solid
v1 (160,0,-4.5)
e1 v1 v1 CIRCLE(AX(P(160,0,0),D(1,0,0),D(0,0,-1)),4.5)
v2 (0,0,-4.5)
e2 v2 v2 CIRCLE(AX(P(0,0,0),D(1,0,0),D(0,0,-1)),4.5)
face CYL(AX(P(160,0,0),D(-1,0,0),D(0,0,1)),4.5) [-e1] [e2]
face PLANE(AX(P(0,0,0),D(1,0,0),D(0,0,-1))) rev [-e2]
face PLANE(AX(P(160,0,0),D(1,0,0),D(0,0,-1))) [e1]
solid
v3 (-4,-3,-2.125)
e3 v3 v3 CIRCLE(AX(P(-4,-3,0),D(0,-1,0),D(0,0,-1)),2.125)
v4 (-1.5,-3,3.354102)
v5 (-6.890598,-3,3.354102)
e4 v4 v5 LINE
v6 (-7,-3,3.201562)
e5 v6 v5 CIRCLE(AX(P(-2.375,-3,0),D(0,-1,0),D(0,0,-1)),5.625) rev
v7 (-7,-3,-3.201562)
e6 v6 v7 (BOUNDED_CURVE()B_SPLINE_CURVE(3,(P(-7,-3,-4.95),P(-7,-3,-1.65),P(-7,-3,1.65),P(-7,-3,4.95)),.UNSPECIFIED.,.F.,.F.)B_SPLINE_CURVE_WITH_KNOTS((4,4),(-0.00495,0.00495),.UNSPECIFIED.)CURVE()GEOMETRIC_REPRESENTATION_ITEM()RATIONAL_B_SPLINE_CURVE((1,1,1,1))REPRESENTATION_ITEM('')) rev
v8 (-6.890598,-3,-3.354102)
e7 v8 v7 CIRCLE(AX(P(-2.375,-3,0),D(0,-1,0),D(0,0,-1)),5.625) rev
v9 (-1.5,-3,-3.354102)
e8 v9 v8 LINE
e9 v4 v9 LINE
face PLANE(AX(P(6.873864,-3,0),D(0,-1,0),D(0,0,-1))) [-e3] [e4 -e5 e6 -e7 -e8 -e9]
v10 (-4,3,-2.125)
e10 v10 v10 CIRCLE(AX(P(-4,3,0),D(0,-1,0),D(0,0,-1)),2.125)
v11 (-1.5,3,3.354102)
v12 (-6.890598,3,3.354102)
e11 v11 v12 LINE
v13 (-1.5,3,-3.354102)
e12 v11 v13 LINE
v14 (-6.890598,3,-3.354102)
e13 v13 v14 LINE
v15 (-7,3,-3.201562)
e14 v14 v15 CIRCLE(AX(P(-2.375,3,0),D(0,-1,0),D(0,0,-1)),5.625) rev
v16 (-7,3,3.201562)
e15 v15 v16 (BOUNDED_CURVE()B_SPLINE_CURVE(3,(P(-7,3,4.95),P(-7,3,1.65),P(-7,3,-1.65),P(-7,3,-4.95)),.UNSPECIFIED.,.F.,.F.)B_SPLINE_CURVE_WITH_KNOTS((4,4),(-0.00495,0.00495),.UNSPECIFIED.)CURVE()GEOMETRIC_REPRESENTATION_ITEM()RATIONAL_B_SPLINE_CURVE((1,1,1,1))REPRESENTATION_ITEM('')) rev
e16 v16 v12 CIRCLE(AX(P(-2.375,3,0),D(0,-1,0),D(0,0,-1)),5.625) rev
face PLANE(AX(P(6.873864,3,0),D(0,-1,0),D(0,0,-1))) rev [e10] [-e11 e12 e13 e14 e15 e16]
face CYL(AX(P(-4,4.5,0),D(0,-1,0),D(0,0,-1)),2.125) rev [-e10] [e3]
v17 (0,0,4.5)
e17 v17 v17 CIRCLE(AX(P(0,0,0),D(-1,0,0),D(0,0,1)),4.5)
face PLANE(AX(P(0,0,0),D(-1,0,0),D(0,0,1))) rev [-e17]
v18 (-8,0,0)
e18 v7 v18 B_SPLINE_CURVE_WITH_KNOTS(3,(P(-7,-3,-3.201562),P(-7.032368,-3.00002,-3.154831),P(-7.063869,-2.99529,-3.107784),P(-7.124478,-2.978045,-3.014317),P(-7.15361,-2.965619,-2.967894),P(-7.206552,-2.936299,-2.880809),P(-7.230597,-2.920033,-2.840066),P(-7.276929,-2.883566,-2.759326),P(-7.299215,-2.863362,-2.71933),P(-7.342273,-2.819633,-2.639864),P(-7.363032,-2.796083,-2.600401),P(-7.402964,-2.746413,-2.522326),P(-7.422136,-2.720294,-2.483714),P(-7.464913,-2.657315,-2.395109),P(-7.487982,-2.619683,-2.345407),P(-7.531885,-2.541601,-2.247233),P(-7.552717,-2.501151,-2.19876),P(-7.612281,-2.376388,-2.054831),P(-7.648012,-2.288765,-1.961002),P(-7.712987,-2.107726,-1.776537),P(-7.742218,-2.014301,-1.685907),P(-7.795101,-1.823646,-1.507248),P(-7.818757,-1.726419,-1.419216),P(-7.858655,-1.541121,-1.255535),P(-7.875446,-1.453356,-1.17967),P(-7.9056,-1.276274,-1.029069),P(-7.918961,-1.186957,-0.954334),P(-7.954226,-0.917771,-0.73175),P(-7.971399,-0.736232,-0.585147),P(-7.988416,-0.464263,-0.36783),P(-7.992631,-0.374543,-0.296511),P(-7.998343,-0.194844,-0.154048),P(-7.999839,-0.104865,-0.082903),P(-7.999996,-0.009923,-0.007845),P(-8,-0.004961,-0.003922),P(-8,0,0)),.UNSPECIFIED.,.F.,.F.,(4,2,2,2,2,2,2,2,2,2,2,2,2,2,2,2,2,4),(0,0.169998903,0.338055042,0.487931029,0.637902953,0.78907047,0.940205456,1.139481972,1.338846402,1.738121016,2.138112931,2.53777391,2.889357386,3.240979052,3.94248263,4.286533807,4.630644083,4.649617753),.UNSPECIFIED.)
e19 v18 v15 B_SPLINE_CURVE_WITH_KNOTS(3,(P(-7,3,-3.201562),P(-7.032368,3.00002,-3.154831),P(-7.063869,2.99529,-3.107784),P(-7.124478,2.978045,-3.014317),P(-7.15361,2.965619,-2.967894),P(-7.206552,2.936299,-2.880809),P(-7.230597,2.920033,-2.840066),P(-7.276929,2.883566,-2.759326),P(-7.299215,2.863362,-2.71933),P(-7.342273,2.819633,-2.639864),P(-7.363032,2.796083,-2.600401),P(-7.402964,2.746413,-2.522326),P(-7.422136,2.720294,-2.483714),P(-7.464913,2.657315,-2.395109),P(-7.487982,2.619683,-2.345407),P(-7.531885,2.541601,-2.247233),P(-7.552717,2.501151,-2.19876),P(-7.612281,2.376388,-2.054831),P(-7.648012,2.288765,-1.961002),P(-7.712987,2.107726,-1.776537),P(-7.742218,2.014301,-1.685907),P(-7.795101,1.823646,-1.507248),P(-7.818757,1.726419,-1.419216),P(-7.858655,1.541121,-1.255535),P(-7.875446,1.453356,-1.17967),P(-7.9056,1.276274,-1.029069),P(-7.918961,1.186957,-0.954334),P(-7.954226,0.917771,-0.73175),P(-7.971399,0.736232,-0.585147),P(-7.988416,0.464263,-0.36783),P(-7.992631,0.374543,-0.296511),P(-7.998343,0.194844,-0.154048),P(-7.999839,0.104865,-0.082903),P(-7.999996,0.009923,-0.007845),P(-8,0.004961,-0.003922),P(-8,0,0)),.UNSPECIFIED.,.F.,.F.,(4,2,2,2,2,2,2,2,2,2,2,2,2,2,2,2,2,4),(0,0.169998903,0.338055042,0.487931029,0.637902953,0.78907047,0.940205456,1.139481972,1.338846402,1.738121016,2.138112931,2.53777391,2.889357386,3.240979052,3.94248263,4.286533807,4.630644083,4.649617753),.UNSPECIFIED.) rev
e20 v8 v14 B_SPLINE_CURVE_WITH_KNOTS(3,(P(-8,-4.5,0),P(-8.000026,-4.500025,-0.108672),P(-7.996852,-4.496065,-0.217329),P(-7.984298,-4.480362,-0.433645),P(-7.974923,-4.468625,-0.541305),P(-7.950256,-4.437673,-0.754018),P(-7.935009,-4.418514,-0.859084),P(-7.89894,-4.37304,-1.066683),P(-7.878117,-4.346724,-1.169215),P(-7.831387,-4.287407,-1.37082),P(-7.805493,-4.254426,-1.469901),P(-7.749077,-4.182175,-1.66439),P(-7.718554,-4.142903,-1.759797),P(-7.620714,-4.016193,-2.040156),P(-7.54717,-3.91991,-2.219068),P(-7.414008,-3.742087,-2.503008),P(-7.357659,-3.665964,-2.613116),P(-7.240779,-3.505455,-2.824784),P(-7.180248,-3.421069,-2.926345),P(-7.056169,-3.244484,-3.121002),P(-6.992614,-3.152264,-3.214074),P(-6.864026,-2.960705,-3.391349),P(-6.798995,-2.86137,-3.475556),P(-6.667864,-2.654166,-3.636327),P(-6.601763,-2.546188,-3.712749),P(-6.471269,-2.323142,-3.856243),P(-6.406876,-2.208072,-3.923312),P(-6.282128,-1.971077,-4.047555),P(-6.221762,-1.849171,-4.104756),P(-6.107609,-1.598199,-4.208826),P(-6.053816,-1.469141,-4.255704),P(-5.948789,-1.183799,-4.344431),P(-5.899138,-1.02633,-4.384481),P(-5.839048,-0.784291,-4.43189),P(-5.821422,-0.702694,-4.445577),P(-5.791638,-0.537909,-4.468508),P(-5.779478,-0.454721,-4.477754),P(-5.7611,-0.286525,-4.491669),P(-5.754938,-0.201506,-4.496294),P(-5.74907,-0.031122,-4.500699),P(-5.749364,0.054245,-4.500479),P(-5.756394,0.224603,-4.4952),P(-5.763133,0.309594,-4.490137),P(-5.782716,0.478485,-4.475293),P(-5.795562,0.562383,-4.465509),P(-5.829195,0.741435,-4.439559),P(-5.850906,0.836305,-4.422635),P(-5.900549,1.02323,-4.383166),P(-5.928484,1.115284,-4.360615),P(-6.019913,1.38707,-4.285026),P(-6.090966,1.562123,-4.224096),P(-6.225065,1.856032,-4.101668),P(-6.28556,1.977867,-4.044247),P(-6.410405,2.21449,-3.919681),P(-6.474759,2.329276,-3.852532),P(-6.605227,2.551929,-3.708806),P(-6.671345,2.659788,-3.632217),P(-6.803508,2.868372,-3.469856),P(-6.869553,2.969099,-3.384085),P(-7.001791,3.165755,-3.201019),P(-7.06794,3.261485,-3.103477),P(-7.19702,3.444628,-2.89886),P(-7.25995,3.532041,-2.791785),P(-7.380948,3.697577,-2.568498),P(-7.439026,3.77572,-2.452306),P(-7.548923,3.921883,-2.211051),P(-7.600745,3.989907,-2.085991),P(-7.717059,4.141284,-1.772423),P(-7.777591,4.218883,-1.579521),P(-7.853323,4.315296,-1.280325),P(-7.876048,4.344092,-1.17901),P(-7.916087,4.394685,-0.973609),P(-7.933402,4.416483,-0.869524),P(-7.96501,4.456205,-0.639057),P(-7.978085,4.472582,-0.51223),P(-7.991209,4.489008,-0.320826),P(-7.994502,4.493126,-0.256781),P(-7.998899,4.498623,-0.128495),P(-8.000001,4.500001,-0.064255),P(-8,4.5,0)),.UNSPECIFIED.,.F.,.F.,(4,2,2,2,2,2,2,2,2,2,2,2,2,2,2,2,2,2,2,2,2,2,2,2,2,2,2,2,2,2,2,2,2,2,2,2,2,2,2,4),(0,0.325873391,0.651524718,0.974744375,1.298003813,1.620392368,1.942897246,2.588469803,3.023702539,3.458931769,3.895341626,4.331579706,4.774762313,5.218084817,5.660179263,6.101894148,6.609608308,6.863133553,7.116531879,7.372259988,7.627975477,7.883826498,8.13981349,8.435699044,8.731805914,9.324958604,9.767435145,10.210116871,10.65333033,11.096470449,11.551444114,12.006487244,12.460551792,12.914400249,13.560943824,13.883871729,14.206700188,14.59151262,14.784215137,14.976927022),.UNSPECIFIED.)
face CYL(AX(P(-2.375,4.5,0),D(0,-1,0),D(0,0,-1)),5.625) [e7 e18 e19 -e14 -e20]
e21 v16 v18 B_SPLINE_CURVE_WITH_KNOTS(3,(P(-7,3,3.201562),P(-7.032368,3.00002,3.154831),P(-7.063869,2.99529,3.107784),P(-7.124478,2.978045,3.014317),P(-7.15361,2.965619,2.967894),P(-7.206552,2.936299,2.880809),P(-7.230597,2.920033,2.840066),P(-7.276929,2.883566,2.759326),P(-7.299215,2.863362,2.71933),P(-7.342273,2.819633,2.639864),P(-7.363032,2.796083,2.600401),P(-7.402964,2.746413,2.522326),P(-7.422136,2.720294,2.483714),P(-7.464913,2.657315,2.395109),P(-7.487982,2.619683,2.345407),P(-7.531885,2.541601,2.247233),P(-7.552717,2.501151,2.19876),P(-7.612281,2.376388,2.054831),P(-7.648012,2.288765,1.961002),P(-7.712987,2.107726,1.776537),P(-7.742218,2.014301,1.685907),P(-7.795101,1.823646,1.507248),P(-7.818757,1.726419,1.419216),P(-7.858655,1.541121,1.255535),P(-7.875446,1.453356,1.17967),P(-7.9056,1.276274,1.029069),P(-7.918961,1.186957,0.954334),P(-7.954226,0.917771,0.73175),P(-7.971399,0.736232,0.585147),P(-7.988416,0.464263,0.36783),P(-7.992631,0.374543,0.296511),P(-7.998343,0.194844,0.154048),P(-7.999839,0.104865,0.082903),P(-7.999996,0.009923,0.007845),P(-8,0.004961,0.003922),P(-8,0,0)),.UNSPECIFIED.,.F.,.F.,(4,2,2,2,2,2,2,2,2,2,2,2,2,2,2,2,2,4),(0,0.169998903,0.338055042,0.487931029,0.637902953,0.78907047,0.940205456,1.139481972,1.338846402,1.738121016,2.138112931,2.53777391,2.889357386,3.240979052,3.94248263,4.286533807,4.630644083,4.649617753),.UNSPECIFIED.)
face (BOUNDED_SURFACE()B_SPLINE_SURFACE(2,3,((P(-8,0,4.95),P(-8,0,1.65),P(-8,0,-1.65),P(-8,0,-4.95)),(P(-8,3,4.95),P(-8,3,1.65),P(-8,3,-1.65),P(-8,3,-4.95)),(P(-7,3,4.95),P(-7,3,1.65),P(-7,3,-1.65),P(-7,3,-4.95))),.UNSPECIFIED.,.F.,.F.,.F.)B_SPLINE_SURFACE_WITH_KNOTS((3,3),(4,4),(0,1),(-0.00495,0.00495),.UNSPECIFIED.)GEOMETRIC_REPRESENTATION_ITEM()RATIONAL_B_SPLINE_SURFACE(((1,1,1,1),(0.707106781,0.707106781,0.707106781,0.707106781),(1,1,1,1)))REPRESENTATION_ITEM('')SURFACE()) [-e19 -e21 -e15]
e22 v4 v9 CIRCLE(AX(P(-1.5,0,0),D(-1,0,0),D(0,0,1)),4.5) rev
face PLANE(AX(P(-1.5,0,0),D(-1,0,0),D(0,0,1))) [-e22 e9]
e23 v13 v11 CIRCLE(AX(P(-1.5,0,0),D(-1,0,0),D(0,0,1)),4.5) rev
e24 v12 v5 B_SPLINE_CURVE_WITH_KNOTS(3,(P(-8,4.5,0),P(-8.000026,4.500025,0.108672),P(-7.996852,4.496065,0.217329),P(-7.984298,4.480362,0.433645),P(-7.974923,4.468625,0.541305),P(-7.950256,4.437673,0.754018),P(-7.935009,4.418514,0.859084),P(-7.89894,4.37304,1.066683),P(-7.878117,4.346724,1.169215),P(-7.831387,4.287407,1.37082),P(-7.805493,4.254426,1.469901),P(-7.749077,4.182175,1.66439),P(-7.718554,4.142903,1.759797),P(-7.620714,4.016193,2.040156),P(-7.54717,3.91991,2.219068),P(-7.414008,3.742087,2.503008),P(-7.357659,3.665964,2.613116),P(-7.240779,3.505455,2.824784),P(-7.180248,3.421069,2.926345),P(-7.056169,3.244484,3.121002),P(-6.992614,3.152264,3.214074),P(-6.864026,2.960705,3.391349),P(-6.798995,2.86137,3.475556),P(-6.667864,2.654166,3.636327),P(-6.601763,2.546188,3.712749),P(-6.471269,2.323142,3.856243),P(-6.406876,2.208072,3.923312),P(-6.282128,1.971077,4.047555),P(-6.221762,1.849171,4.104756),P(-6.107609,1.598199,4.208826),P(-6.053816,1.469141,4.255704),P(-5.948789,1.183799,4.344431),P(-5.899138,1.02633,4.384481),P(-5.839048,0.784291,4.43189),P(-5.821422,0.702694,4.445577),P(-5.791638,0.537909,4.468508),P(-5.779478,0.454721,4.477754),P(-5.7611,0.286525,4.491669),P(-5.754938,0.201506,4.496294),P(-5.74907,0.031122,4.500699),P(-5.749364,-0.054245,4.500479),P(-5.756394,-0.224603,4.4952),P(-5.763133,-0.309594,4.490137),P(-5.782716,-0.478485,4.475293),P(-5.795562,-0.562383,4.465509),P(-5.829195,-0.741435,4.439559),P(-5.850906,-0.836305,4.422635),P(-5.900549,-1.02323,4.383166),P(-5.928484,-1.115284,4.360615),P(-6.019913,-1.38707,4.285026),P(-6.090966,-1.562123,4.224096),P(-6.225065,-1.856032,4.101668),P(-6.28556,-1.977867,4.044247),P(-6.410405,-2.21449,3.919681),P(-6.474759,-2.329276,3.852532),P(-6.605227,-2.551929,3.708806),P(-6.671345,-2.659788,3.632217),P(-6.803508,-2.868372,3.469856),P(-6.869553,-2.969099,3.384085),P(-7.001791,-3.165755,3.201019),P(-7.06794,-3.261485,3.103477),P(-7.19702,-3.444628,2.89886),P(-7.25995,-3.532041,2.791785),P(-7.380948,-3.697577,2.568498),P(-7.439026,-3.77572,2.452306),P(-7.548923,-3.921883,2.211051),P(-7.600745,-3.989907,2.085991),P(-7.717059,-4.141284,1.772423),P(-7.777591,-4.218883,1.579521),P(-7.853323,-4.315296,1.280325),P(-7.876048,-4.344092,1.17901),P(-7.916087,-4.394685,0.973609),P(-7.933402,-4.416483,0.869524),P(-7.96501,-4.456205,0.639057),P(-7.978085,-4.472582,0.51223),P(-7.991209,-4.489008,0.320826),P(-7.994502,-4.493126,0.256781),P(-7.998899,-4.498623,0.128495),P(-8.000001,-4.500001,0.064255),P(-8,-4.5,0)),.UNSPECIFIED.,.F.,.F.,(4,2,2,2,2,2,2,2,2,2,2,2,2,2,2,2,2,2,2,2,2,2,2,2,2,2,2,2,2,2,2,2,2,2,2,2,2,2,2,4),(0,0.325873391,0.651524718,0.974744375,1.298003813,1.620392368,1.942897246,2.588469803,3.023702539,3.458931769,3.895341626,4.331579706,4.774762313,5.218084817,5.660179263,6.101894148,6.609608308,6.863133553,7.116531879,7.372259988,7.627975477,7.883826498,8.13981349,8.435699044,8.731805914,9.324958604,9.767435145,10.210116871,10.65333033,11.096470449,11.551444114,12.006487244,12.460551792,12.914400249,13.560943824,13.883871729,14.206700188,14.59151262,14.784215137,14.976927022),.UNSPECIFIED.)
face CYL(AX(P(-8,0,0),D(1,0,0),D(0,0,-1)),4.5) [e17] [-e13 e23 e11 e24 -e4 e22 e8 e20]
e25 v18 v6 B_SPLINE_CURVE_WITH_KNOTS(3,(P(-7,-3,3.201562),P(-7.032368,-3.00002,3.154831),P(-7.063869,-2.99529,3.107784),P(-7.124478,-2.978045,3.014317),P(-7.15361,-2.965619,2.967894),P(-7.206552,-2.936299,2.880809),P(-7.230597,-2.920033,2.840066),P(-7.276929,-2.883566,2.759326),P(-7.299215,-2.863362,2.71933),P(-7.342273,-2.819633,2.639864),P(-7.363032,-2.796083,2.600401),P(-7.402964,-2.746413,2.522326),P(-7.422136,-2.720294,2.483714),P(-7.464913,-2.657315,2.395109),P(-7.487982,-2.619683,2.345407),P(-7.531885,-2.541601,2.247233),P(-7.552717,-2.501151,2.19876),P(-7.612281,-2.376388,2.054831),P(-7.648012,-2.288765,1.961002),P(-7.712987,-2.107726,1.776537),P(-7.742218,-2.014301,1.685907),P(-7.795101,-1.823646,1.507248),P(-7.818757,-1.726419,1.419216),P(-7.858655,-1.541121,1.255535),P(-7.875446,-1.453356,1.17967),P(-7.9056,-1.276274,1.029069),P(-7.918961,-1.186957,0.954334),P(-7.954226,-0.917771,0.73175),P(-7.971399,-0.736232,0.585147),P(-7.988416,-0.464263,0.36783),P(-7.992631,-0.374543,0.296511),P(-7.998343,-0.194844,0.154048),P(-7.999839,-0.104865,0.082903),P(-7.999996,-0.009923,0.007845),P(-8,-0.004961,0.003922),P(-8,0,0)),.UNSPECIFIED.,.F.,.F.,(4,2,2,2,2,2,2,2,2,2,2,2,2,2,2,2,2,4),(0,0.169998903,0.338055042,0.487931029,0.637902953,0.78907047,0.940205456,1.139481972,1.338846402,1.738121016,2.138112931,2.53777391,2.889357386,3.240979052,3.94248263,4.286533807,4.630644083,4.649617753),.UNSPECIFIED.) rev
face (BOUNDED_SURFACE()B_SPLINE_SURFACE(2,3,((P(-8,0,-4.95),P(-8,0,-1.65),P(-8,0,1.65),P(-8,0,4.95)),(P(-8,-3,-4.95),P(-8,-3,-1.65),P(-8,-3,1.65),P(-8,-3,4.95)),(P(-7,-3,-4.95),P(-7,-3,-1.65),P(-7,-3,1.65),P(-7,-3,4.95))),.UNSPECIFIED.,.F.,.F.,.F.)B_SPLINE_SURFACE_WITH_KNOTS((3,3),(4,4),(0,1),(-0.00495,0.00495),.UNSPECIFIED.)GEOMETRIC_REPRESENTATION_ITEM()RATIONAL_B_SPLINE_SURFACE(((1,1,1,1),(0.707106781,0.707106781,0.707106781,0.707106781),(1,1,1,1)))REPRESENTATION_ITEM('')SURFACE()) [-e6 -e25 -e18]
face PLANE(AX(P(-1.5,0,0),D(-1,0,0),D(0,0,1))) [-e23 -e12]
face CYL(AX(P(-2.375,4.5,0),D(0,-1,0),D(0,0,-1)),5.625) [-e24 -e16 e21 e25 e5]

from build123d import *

# Parameters (mm, degrees)
SKETCH2_R               = 4.5
BOSS_EXTRUDE1_DEPTH     = 160
SKETCH3_R               = 4.5
BOSS_EXTRUDE2_DEPTH     = 8
CUT_EXTRUDE1_DEPTH      = 6.5
SKETCH5_R               = 2.125
CUT_EXTRUDE2_DEPTH      = 161.23888417
FILLET2_SIZE            = 3
FILLET2_SIZE_2          = 1
FILLET3_SIZE            = 3
FILLET3_SIZE_2          = 1
CUT_EXTRUDE5_DEPTH      = 161.238884177
CUT_EXTRUDE5_DEPTH_BACK = 161.238884177


with BuildPart() as part:
    # Sketch2 → Boss-Extrude1 (new body)
    with BuildSketch(Plane(origin=(0, 0, 0), x_dir=(0, 0, -1), z_dir=(1, 0, 0))):
        Circle(SKETCH2_R)
    extrude(amount=BOSS_EXTRUDE1_DEPTH)


with BuildPart() as body_2:
    # Sketch3 → Boss-Extrude2 (new body)
    with BuildSketch(Plane.ZY):
        Circle(SKETCH3_R)
    extrude(amount=BOSS_EXTRUDE2_DEPTH)

    # Sketch4 → Cut-Extrude1 (cut)
    with BuildSketch(Plane.ZY.offset(8)):
        with BuildLine():
            ThreePointArc((3.354101966, 3), (0, 4.5), (-3.354101966, 3))
            Line((-3.354101966, 3), (3.354101966, 3))
        make_face()
        with BuildLine():
            Line((3.354101966, -3), (-3.354101966, -3))
            ThreePointArc((-3.354101966, -3), (0, -4.5), (3.354101966, -3))
        make_face()
    extrude(amount=-CUT_EXTRUDE1_DEPTH, mode=Mode.SUBTRACT)

    # Sketch5 → Cut-Extrude2 (cut, through all)
    with BuildSketch(Plane.XZ.offset(3)):
        with Locations(Location((-4, 0, 0), (0, 0, 270))):
            Circle(SKETCH5_R)
    extrude(amount=-CUT_EXTRUDE2_DEPTH, mode=Mode.SUBTRACT)

    # Fillet2
    # an asymmetric fillet: 3, 1 mm, written as the material it takes off along each edge
    with BuildSketch(Plane(origin=(-8, -3, 10.854101966), x_dir=(0, 1, 0), z_dir=(0, 0, -1))) as fillet2_piece_1:
        with BuildLine():
            Bezier((FILLET2_SIZE, 0), (0, 0), (0, FILLET2_SIZE_2), weights=[1, 0.707106781, 1])
            Line((0, FILLET2_SIZE_2), (0, 0))
            Line((0, 0), (FILLET2_SIZE, 0))
        make_face()
    extrude(amount=21.708203932, mode=Mode.SUBTRACT)

    # Fillet3
    # an asymmetric fillet: 3, 1 mm, written as the material it takes off along each edge
    with BuildSketch(Plane(origin=(-8, 3, -10.854101966), x_dir=(0, -1, 0), z_dir=(0, 0, 1))) as fillet3_piece_1:
        with BuildLine():
            Bezier((FILLET3_SIZE, 0), (0, 0), (0, FILLET3_SIZE_2), weights=[1, 0.707106781, 1])
            Line((0, FILLET3_SIZE_2), (0, 0))
            Line((0, 0), (FILLET3_SIZE, 0))
        make_face()
    extrude(amount=21.708203932, mode=Mode.SUBTRACT)

    # Sketch8 → Cut-Extrude5 (cut, two sides: drawn at the far end of the back side and taken through both)
    with BuildSketch(Plane.XZ.offset(3).offset(-CUT_EXTRUDE5_DEPTH_BACK)):
        with BuildLine():
            Line((-7, -3.354101966), (-6.890597967, -3.354101966))
            ThreePointArc((-6.890597967, -3.354101966), (-6.945935342, -3.278288441), (-7, -3.201562119))
            Line((-7, -3.201562119), (-7, -3.354101966))
        make_face()
        with BuildLine():
            Line((-8, -4.5), (-5.75, -4.5))
            ThreePointArc((-5.75, -4.5), (-6.361684668, -3.968245249), (-6.890597967, -3.354101966))
            Line((-6.890597967, -3.354101966), (-7, -3.354101966))
            Line((-7, -3.354101966), (-7, -3.201562119))
            ThreePointArc((-7, -3.201562119), (-7.744182899, -1.677050983), (-8, 0))
            Line((-8, 0), (-8, -4.5))
        make_face()
        with BuildLine():
            Line((-7, 3.354101966), (-7, 3.201562119))
            ThreePointArc((-7, 3.201562119), (-6.945935342, 3.278288441), (-6.890597967, 3.354101966))
            Line((-6.890597967, 3.354101966), (-7, 3.354101966))
        make_face()
        with BuildLine():
            Line((-8, 4.5), (-8, 0))
            ThreePointArc((-8, 0), (-7.744182899, 1.677050983), (-7, 3.201562119))
            Line((-7, 3.201562119), (-7, 3.354101966))
            Line((-7, 3.354101966), (-6.890597967, 3.354101966))
            ThreePointArc((-6.890597967, 3.354101966), (-6.361684668, 3.968245249), (-5.75, 4.5))
            Line((-5.75, 4.5), (-8, 4.5))
        make_face()
    extrude(amount=CUT_EXTRUDE5_DEPTH + CUT_EXTRUDE5_DEPTH_BACK, mode=Mode.SUBTRACT)


solid = Compound([part.part, body_2.part])
